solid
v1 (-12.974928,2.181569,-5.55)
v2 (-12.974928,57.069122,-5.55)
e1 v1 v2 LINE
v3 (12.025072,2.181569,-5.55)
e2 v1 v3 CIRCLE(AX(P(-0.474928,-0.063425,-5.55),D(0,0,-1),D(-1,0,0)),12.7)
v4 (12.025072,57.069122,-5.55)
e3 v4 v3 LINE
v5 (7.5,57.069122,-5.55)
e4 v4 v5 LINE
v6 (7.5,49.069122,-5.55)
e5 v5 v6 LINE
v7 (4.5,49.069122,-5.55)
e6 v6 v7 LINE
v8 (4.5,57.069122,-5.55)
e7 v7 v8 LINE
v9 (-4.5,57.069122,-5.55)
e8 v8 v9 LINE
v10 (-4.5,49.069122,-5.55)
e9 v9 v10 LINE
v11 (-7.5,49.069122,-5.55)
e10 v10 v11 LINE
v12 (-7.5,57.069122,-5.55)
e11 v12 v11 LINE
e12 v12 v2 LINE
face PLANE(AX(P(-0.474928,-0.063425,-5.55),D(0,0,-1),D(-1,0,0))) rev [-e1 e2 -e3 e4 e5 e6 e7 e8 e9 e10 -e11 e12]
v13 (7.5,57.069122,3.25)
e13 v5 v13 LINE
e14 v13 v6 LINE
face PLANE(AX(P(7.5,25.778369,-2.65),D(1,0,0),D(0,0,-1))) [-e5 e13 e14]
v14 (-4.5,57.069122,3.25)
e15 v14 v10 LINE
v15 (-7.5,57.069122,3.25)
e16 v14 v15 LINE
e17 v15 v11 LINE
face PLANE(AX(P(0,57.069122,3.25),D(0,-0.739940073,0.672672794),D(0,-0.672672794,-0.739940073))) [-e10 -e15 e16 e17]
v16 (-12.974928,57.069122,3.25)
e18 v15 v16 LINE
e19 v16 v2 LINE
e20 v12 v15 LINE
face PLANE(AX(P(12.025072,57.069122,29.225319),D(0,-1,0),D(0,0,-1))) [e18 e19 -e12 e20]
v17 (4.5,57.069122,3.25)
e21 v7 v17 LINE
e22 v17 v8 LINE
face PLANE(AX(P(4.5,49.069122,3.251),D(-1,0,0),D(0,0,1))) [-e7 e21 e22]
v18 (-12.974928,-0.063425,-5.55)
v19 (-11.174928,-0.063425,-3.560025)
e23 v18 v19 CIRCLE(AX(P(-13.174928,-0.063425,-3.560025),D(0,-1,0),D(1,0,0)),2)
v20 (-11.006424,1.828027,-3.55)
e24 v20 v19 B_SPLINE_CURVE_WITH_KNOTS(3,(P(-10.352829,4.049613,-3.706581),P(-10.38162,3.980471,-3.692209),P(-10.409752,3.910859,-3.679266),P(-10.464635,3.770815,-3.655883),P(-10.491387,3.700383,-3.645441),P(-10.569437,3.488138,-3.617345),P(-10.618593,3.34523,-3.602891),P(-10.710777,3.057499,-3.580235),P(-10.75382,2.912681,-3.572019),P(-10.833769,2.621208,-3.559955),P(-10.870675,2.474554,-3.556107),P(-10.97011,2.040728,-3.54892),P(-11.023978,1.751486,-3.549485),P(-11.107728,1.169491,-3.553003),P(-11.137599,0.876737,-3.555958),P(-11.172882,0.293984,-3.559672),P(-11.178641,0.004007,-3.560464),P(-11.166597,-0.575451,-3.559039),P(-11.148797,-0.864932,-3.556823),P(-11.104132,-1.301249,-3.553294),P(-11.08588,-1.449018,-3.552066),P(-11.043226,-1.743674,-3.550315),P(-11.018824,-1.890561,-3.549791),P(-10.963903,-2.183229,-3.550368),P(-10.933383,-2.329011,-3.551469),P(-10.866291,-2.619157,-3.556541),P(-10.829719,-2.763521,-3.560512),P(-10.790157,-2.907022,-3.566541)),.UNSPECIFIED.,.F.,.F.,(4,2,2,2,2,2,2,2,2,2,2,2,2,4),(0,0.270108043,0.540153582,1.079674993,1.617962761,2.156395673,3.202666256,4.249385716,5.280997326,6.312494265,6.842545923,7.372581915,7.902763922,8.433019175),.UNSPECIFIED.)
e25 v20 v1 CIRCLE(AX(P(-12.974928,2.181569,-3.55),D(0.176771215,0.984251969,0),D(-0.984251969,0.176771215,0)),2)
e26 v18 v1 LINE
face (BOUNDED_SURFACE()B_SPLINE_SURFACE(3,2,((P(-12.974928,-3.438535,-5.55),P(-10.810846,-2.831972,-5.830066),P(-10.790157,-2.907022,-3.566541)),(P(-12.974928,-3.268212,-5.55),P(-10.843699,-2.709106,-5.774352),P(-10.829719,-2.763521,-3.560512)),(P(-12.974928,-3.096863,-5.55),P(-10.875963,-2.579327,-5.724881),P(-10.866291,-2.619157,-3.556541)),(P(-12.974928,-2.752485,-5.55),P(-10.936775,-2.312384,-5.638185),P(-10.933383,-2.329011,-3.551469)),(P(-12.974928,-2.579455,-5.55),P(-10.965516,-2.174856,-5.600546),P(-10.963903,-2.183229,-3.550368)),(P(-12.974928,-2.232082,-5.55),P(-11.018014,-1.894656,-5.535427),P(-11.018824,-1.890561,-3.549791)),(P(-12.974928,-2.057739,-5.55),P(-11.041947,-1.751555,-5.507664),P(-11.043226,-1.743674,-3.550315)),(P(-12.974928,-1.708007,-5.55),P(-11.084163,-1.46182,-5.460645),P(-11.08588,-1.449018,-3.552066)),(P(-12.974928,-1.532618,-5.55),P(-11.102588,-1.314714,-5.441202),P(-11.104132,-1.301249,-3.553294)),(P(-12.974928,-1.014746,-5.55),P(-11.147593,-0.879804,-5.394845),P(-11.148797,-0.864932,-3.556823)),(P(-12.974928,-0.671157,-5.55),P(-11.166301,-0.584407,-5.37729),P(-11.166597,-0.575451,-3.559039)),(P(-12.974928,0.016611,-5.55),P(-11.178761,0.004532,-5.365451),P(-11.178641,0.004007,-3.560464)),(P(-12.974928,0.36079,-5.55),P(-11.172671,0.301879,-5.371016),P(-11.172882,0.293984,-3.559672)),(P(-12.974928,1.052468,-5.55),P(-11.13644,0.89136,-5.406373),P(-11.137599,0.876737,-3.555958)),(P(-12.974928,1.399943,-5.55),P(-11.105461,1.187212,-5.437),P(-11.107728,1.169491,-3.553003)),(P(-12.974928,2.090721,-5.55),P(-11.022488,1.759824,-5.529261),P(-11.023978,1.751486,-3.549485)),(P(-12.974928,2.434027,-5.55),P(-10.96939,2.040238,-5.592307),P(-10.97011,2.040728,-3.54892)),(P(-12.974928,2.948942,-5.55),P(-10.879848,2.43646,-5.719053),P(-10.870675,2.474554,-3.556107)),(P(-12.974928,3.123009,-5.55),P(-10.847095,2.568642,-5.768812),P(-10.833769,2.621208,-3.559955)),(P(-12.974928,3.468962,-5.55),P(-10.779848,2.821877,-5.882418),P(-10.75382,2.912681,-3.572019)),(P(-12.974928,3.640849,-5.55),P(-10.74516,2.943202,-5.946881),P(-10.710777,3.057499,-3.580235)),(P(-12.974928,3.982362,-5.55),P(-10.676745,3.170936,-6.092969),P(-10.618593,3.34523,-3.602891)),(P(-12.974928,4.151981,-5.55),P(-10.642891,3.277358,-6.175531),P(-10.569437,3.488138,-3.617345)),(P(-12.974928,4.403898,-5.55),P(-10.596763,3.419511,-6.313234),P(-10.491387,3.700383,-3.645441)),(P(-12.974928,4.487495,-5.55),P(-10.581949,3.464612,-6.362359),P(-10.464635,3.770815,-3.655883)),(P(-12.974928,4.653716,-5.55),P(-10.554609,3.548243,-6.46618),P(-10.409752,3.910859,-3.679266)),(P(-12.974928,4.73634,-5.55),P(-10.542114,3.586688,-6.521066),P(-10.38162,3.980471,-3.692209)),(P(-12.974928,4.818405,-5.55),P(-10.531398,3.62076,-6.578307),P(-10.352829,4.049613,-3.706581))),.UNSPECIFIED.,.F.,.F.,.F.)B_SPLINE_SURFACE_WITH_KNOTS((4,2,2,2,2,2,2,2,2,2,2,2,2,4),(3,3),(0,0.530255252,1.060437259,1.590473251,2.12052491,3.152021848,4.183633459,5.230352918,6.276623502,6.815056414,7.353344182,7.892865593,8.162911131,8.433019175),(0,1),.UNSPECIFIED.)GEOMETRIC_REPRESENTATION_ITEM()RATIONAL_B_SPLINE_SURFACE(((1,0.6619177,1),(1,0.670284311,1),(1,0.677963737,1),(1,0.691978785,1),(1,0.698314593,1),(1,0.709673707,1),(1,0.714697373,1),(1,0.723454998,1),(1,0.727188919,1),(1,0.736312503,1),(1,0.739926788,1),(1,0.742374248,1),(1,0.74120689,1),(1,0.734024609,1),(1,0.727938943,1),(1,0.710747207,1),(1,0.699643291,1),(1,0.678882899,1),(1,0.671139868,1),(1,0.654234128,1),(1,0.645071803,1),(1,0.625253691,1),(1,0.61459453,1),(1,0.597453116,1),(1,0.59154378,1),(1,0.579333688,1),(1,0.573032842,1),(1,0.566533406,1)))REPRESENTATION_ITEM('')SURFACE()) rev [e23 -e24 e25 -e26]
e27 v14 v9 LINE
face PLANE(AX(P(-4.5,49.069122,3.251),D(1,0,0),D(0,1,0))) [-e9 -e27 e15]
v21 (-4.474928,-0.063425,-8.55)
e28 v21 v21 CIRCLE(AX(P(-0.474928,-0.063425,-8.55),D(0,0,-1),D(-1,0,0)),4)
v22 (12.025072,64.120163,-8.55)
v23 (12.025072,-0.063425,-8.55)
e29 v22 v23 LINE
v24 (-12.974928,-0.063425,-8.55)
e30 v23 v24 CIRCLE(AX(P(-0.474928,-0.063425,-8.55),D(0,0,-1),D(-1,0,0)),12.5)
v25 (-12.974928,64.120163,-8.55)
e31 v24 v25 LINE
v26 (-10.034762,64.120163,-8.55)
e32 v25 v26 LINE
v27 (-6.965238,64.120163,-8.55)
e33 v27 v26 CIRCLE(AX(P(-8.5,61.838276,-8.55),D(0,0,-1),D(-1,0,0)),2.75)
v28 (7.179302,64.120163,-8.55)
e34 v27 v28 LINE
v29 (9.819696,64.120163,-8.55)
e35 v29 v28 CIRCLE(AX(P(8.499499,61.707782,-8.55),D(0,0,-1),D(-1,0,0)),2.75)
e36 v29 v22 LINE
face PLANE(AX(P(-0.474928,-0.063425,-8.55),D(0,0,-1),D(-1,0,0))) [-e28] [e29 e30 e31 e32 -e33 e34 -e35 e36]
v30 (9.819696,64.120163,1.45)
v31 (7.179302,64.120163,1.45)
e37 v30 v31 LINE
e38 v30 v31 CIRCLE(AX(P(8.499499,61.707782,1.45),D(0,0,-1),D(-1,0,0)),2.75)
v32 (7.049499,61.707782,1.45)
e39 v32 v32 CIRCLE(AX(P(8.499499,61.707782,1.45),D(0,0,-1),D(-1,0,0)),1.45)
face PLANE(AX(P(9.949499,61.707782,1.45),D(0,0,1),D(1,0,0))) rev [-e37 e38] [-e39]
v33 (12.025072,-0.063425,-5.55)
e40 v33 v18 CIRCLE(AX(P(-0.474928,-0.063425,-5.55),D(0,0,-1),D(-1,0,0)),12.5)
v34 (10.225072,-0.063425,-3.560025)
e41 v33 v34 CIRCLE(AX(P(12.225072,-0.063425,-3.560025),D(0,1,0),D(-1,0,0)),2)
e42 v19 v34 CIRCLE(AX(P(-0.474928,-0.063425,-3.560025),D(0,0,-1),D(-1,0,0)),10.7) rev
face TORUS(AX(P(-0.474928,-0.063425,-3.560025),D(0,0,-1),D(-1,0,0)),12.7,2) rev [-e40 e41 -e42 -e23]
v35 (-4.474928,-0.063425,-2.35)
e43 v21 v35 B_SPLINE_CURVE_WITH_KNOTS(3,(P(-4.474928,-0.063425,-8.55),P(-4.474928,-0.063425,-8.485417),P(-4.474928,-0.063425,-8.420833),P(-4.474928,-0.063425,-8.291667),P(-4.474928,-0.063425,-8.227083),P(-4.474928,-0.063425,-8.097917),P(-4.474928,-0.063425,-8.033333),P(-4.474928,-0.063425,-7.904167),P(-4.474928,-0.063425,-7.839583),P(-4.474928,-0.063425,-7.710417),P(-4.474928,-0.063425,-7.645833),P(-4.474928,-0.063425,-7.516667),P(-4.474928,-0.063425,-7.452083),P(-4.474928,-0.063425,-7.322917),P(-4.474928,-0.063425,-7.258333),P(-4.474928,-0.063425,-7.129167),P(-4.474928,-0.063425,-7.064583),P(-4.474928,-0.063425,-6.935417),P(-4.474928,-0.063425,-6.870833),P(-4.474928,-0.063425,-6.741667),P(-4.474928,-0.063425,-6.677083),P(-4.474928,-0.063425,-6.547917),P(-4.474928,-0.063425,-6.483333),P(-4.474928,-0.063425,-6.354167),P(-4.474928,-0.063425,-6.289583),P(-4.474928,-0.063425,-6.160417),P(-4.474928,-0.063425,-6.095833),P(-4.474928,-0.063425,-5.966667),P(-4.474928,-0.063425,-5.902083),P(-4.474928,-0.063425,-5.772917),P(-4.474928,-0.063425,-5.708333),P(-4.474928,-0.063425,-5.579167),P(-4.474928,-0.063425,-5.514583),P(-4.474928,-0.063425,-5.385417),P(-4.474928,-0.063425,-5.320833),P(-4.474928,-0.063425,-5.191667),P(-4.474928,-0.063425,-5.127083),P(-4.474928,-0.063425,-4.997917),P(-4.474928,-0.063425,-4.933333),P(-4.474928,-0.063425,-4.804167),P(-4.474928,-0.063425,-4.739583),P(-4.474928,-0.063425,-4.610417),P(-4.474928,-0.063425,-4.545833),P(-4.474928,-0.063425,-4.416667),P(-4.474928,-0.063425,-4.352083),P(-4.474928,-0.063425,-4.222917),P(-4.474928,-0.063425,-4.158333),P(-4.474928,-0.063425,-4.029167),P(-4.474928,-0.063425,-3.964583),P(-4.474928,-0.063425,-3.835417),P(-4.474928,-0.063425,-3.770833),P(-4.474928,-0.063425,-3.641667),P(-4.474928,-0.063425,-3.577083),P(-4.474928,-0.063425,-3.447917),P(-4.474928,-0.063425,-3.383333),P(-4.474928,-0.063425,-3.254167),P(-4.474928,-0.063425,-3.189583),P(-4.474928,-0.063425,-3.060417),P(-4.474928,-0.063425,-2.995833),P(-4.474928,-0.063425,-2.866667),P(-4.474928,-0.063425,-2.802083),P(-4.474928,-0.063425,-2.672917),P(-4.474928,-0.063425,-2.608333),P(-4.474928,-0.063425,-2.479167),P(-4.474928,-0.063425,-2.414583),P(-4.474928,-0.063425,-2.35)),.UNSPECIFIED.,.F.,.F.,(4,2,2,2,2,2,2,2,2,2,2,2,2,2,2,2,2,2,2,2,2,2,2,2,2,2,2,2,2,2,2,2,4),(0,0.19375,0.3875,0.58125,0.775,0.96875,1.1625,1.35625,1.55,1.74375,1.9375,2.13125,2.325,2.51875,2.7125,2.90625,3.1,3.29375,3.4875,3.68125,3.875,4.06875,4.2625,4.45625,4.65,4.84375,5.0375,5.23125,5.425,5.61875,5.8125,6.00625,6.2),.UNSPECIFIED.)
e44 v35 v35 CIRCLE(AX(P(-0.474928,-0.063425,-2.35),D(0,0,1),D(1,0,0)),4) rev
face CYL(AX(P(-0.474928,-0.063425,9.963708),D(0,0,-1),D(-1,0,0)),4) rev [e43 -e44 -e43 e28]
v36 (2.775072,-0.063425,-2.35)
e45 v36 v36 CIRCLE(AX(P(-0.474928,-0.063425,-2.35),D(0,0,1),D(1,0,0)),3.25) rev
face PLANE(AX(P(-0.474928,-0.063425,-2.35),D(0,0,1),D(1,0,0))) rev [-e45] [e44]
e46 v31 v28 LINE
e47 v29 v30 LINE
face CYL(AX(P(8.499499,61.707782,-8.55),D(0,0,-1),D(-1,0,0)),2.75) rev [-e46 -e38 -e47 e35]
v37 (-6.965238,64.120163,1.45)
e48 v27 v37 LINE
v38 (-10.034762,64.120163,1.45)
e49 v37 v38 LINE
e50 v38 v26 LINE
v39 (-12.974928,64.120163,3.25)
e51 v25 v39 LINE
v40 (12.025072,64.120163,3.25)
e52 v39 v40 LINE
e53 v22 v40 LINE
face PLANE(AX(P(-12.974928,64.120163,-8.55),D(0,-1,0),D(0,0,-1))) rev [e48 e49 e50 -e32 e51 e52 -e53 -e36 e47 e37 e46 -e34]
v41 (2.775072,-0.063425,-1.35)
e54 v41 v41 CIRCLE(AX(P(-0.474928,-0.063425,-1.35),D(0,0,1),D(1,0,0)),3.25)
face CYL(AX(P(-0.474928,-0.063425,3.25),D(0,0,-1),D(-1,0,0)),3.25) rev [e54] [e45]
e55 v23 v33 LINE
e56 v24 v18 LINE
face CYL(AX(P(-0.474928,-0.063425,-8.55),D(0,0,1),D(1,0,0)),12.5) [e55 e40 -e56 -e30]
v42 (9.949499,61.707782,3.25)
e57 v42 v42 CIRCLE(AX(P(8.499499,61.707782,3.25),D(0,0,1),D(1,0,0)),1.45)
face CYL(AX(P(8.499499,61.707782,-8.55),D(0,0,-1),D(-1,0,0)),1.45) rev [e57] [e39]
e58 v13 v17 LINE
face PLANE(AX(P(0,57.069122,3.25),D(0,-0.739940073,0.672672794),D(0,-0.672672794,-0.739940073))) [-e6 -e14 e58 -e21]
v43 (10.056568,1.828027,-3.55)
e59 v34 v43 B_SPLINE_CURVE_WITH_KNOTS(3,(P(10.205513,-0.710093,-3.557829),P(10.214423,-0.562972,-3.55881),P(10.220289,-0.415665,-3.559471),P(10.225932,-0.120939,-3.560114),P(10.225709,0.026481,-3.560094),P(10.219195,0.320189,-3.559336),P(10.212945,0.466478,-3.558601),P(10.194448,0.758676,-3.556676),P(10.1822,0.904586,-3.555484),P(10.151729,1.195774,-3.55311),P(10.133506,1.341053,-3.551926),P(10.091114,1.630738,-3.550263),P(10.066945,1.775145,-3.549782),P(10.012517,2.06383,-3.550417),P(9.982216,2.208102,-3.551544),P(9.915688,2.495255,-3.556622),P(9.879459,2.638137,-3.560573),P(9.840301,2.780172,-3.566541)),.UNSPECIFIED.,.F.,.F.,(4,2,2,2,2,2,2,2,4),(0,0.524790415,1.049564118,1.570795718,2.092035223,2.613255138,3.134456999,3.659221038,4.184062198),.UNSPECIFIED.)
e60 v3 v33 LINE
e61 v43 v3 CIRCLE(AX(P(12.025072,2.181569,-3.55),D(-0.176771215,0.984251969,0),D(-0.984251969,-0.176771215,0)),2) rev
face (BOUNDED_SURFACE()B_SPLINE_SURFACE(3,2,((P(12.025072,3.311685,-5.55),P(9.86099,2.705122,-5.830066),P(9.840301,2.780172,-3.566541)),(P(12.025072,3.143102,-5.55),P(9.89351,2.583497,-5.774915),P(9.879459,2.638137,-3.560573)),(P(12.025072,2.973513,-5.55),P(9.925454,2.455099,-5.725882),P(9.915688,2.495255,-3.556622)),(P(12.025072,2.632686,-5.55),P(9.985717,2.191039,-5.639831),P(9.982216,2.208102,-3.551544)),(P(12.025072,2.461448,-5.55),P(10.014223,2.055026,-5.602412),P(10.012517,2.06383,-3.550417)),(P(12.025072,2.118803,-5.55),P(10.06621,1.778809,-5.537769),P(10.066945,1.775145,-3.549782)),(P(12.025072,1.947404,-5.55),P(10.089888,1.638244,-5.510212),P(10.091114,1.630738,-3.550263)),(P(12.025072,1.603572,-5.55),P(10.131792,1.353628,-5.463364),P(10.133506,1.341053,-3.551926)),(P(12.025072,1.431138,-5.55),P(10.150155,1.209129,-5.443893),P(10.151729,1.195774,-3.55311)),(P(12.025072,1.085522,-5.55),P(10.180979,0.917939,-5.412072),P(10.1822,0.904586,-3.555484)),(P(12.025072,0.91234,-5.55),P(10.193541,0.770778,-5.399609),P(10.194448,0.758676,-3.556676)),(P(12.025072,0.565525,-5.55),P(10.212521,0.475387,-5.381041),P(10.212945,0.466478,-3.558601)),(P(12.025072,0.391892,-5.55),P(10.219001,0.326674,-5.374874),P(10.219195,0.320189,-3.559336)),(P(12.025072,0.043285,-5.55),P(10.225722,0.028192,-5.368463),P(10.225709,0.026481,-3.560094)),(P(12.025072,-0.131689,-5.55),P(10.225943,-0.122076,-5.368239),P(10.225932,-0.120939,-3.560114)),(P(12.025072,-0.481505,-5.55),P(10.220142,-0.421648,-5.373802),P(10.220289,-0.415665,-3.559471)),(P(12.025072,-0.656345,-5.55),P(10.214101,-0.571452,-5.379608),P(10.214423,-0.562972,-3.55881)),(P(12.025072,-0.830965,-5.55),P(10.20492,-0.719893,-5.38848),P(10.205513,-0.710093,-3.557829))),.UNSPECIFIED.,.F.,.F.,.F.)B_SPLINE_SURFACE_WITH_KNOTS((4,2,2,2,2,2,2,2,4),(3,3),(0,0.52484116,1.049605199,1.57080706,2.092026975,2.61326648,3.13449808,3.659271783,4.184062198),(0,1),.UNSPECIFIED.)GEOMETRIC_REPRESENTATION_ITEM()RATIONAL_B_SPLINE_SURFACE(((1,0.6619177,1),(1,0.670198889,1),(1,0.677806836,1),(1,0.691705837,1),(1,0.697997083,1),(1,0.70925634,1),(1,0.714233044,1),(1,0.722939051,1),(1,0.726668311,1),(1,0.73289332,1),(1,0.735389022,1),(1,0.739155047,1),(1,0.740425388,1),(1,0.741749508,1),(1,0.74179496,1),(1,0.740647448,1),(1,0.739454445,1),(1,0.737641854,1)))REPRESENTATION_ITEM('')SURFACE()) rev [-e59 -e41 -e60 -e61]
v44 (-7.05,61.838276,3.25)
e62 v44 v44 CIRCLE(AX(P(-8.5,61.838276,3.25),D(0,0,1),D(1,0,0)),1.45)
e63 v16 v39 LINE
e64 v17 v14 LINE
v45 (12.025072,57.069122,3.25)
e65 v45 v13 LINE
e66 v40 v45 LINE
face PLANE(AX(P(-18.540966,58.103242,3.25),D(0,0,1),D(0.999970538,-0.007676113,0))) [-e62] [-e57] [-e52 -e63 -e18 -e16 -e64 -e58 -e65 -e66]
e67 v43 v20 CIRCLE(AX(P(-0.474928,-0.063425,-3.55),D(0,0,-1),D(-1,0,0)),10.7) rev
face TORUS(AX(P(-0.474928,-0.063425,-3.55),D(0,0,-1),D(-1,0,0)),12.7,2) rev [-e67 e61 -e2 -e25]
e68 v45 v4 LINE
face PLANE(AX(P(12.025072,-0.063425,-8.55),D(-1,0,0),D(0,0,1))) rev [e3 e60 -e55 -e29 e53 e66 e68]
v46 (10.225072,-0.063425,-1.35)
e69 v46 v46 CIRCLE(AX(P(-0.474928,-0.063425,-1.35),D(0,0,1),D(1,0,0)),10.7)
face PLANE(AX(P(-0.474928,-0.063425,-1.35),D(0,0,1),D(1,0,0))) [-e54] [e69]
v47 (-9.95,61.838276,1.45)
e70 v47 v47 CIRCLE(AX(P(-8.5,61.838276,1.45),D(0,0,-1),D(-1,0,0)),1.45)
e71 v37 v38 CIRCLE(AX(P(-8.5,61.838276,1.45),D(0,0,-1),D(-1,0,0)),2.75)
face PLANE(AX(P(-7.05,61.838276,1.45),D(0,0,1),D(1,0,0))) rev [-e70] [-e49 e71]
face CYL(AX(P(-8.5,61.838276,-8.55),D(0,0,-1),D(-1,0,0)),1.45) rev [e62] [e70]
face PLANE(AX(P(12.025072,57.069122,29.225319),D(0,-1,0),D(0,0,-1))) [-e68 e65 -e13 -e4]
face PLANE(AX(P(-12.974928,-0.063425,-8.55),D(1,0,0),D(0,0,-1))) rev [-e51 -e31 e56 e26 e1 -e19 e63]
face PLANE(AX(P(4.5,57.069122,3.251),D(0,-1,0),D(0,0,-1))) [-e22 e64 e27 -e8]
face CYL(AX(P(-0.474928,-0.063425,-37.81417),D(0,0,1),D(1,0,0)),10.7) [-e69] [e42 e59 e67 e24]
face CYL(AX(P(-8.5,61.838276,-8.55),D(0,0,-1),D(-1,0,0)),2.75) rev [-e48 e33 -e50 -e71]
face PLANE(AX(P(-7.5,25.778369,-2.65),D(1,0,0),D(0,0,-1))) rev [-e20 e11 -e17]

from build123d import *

# Parameters (mm, degrees)
ESBO_O2_R                           = 10.7
RESSALTO_EXTRUS_O1_DEPTH            = 4.2
RESSALTO_EXTRUS_O3_DEPTH            = 3
ESBO_O5_W                           = 25
ESBO_O5_H                           = 7.051040728
RESSALTO_EXTRUS_O4_DEPTH            = 11.8
REBAIXO_PARA_SHCS_M2_51_D           = 2.9
REBAIXO_PARA_SHCS_M2_51_CBORE_D     = 5.5
REBAIXO_PARA_SHCS_M2_51_CBORE_DEPTH = 10
NERVURA1_REACH                      = 67.976
ESBO_O10_WALL_W                     = 145.845066172
ESBO_O10_WALL_H                     = 15
CORTE_EXTRUS_O1_REACH               = 68.009
ESBO_O11_W                          = 9
ESBO_O11_H                          = 8
ESBO_O12_R                          = 3.25
CORTE_EXTRUS_O2_DEPTH               = 67.475439137
ESBO_O13_R                          = 4
CORTE_EXTRUS_O3_DEPTH               = 6.2
FILETE1_R                           = 2


with BuildPart() as part:
    # Esboço2 → Ressalto-extrusão1 (new body)
    with BuildSketch(Plane.XY.offset(-1.35)):
        with Locations((-0.474928023, -0.063425095)):
            Circle(ESBO_O2_R)
    extrude(amount=-RESSALTO_EXTRUS_O1_DEPTH)

    # Esboço4 → Ressalto-extrusão3 (add)
    with BuildSketch(Plane(origin=(0, 0, -5.55), x_dir=(-1, 0, 0), z_dir=(0, 0, -1))):
        with BuildLine():
            Line((-12.025071977, -0.063425095), (-12.025071977, 64.120162595))
            Line((-12.025071977, 64.120162595), (12.974928023, 64.120162595))
            Line((12.974928023, 64.120162595), (12.974928023, -0.063425095))
            ThreePointArc((12.974928023, -0.063425095), (0.474928023, -12.563425095), (-12.025071977, -0.063425095))
        make_face()
    extrude(amount=RESSALTO_EXTRUS_O3_DEPTH)

    # Esboço5 → Ressalto-extrusão4 (add)
    with BuildSketch(Plane(origin=(0, 0, -8.55), x_dir=(-1, 0, 0), z_dir=(0, 0, -1))):
        with Locations((0.474928023, 60.594642231)):
            Rectangle(ESBO_O5_W, ESBO_O5_H)
    extrude(amount=-RESSALTO_EXTRUS_O4_DEPTH)

    # Rebaixo para SHCS M2.51 (through all)
    with Locations(Plane(origin=(0, 0, -8.55), x_dir=(-1, 0, 0), z_dir=(0, 0, -1))):
        with Locations((-8.49949915, 61.707782077), (8.5, 61.838275999)):
            CounterBoreHole(REBAIXO_PARA_SHCS_M2_51_D / 2, REBAIXO_PARA_SHCS_M2_51_CBORE_D / 2, REBAIXO_PARA_SHCS_M2_51_CBORE_DEPTH)

    # Esboço10 wall → Nervura1 (add, up to next)
    with BuildSketch(Plane(origin=(0, 53.069121867, -1.15), x_dir=(0, -0.672672793996, -0.739940073396), z_dir=(0, 0.739940073396, -0.672672793996)), mode=Mode.PRIVATE) as nervura1_sk1:
        Rectangle(ESBO_O10_WALL_W, ESBO_O10_WALL_H)
    nervura1_tool1 = extrude(nervura1_sk1.sketch, amount=NERVURA1_REACH, mode=Mode.PRIVATE) - part.part
    add(nervura1_tool1.solids().sort_by_distance((0, 53.069121867, -1.15))[0])

    # Esboço11 → Corte-extrusão1 (cut, up to next)
    with BuildSketch(Plane.XY.offset(-5.55), mode=Mode.PRIVATE) as corte_extrus_o1_sk1:
        with Locations((0, 53.069121867)):
            Rectangle(ESBO_O11_W, ESBO_O11_H)
    corte_extrus_o1_tool1 = extrude(corte_extrus_o1_sk1.sketch, amount=CORTE_EXTRUS_O1_REACH, mode=Mode.PRIVATE) & part.part
    add(corte_extrus_o1_tool1.solids().sort_by_distance((0, 53.069122, -5.55))[0], mode=Mode.SUBTRACT)

    # Esboço12 → Corte-extrusão2 (cut, through all)
    with BuildSketch(Plane(origin=(0, 0, -8.55), x_dir=(-1, 0, 0), z_dir=(0, 0, -1))):
        with Locations((0.474928023, -0.063425095)):
            Circle(ESBO_O12_R)
    extrude(amount=-CORTE_EXTRUS_O2_DEPTH, mode=Mode.SUBTRACT)

    # Esboço13 → Corte-extrusão3 (cut)
    with BuildSketch(Plane(origin=(0, 0, -8.55), x_dir=(-1, 0, 0), z_dir=(0, 0, -1))):
        with Locations((0.474928023, -0.063425095)):
            Circle(ESBO_O13_R)
    extrude(amount=-CORTE_EXTRUS_O3_DEPTH, mode=Mode.SUBTRACT)

    # Filete1
    filete1_edges = [part.edges().sort_by_distance(p)[0] for p in [
        (-11.174928023, -0.063425095, -5.55),
    ]]
    fillet(filete1_edges, radius=FILETE1_R - 0.0001)  # a hair under: the kernel refuses the full size


solid = part.part
